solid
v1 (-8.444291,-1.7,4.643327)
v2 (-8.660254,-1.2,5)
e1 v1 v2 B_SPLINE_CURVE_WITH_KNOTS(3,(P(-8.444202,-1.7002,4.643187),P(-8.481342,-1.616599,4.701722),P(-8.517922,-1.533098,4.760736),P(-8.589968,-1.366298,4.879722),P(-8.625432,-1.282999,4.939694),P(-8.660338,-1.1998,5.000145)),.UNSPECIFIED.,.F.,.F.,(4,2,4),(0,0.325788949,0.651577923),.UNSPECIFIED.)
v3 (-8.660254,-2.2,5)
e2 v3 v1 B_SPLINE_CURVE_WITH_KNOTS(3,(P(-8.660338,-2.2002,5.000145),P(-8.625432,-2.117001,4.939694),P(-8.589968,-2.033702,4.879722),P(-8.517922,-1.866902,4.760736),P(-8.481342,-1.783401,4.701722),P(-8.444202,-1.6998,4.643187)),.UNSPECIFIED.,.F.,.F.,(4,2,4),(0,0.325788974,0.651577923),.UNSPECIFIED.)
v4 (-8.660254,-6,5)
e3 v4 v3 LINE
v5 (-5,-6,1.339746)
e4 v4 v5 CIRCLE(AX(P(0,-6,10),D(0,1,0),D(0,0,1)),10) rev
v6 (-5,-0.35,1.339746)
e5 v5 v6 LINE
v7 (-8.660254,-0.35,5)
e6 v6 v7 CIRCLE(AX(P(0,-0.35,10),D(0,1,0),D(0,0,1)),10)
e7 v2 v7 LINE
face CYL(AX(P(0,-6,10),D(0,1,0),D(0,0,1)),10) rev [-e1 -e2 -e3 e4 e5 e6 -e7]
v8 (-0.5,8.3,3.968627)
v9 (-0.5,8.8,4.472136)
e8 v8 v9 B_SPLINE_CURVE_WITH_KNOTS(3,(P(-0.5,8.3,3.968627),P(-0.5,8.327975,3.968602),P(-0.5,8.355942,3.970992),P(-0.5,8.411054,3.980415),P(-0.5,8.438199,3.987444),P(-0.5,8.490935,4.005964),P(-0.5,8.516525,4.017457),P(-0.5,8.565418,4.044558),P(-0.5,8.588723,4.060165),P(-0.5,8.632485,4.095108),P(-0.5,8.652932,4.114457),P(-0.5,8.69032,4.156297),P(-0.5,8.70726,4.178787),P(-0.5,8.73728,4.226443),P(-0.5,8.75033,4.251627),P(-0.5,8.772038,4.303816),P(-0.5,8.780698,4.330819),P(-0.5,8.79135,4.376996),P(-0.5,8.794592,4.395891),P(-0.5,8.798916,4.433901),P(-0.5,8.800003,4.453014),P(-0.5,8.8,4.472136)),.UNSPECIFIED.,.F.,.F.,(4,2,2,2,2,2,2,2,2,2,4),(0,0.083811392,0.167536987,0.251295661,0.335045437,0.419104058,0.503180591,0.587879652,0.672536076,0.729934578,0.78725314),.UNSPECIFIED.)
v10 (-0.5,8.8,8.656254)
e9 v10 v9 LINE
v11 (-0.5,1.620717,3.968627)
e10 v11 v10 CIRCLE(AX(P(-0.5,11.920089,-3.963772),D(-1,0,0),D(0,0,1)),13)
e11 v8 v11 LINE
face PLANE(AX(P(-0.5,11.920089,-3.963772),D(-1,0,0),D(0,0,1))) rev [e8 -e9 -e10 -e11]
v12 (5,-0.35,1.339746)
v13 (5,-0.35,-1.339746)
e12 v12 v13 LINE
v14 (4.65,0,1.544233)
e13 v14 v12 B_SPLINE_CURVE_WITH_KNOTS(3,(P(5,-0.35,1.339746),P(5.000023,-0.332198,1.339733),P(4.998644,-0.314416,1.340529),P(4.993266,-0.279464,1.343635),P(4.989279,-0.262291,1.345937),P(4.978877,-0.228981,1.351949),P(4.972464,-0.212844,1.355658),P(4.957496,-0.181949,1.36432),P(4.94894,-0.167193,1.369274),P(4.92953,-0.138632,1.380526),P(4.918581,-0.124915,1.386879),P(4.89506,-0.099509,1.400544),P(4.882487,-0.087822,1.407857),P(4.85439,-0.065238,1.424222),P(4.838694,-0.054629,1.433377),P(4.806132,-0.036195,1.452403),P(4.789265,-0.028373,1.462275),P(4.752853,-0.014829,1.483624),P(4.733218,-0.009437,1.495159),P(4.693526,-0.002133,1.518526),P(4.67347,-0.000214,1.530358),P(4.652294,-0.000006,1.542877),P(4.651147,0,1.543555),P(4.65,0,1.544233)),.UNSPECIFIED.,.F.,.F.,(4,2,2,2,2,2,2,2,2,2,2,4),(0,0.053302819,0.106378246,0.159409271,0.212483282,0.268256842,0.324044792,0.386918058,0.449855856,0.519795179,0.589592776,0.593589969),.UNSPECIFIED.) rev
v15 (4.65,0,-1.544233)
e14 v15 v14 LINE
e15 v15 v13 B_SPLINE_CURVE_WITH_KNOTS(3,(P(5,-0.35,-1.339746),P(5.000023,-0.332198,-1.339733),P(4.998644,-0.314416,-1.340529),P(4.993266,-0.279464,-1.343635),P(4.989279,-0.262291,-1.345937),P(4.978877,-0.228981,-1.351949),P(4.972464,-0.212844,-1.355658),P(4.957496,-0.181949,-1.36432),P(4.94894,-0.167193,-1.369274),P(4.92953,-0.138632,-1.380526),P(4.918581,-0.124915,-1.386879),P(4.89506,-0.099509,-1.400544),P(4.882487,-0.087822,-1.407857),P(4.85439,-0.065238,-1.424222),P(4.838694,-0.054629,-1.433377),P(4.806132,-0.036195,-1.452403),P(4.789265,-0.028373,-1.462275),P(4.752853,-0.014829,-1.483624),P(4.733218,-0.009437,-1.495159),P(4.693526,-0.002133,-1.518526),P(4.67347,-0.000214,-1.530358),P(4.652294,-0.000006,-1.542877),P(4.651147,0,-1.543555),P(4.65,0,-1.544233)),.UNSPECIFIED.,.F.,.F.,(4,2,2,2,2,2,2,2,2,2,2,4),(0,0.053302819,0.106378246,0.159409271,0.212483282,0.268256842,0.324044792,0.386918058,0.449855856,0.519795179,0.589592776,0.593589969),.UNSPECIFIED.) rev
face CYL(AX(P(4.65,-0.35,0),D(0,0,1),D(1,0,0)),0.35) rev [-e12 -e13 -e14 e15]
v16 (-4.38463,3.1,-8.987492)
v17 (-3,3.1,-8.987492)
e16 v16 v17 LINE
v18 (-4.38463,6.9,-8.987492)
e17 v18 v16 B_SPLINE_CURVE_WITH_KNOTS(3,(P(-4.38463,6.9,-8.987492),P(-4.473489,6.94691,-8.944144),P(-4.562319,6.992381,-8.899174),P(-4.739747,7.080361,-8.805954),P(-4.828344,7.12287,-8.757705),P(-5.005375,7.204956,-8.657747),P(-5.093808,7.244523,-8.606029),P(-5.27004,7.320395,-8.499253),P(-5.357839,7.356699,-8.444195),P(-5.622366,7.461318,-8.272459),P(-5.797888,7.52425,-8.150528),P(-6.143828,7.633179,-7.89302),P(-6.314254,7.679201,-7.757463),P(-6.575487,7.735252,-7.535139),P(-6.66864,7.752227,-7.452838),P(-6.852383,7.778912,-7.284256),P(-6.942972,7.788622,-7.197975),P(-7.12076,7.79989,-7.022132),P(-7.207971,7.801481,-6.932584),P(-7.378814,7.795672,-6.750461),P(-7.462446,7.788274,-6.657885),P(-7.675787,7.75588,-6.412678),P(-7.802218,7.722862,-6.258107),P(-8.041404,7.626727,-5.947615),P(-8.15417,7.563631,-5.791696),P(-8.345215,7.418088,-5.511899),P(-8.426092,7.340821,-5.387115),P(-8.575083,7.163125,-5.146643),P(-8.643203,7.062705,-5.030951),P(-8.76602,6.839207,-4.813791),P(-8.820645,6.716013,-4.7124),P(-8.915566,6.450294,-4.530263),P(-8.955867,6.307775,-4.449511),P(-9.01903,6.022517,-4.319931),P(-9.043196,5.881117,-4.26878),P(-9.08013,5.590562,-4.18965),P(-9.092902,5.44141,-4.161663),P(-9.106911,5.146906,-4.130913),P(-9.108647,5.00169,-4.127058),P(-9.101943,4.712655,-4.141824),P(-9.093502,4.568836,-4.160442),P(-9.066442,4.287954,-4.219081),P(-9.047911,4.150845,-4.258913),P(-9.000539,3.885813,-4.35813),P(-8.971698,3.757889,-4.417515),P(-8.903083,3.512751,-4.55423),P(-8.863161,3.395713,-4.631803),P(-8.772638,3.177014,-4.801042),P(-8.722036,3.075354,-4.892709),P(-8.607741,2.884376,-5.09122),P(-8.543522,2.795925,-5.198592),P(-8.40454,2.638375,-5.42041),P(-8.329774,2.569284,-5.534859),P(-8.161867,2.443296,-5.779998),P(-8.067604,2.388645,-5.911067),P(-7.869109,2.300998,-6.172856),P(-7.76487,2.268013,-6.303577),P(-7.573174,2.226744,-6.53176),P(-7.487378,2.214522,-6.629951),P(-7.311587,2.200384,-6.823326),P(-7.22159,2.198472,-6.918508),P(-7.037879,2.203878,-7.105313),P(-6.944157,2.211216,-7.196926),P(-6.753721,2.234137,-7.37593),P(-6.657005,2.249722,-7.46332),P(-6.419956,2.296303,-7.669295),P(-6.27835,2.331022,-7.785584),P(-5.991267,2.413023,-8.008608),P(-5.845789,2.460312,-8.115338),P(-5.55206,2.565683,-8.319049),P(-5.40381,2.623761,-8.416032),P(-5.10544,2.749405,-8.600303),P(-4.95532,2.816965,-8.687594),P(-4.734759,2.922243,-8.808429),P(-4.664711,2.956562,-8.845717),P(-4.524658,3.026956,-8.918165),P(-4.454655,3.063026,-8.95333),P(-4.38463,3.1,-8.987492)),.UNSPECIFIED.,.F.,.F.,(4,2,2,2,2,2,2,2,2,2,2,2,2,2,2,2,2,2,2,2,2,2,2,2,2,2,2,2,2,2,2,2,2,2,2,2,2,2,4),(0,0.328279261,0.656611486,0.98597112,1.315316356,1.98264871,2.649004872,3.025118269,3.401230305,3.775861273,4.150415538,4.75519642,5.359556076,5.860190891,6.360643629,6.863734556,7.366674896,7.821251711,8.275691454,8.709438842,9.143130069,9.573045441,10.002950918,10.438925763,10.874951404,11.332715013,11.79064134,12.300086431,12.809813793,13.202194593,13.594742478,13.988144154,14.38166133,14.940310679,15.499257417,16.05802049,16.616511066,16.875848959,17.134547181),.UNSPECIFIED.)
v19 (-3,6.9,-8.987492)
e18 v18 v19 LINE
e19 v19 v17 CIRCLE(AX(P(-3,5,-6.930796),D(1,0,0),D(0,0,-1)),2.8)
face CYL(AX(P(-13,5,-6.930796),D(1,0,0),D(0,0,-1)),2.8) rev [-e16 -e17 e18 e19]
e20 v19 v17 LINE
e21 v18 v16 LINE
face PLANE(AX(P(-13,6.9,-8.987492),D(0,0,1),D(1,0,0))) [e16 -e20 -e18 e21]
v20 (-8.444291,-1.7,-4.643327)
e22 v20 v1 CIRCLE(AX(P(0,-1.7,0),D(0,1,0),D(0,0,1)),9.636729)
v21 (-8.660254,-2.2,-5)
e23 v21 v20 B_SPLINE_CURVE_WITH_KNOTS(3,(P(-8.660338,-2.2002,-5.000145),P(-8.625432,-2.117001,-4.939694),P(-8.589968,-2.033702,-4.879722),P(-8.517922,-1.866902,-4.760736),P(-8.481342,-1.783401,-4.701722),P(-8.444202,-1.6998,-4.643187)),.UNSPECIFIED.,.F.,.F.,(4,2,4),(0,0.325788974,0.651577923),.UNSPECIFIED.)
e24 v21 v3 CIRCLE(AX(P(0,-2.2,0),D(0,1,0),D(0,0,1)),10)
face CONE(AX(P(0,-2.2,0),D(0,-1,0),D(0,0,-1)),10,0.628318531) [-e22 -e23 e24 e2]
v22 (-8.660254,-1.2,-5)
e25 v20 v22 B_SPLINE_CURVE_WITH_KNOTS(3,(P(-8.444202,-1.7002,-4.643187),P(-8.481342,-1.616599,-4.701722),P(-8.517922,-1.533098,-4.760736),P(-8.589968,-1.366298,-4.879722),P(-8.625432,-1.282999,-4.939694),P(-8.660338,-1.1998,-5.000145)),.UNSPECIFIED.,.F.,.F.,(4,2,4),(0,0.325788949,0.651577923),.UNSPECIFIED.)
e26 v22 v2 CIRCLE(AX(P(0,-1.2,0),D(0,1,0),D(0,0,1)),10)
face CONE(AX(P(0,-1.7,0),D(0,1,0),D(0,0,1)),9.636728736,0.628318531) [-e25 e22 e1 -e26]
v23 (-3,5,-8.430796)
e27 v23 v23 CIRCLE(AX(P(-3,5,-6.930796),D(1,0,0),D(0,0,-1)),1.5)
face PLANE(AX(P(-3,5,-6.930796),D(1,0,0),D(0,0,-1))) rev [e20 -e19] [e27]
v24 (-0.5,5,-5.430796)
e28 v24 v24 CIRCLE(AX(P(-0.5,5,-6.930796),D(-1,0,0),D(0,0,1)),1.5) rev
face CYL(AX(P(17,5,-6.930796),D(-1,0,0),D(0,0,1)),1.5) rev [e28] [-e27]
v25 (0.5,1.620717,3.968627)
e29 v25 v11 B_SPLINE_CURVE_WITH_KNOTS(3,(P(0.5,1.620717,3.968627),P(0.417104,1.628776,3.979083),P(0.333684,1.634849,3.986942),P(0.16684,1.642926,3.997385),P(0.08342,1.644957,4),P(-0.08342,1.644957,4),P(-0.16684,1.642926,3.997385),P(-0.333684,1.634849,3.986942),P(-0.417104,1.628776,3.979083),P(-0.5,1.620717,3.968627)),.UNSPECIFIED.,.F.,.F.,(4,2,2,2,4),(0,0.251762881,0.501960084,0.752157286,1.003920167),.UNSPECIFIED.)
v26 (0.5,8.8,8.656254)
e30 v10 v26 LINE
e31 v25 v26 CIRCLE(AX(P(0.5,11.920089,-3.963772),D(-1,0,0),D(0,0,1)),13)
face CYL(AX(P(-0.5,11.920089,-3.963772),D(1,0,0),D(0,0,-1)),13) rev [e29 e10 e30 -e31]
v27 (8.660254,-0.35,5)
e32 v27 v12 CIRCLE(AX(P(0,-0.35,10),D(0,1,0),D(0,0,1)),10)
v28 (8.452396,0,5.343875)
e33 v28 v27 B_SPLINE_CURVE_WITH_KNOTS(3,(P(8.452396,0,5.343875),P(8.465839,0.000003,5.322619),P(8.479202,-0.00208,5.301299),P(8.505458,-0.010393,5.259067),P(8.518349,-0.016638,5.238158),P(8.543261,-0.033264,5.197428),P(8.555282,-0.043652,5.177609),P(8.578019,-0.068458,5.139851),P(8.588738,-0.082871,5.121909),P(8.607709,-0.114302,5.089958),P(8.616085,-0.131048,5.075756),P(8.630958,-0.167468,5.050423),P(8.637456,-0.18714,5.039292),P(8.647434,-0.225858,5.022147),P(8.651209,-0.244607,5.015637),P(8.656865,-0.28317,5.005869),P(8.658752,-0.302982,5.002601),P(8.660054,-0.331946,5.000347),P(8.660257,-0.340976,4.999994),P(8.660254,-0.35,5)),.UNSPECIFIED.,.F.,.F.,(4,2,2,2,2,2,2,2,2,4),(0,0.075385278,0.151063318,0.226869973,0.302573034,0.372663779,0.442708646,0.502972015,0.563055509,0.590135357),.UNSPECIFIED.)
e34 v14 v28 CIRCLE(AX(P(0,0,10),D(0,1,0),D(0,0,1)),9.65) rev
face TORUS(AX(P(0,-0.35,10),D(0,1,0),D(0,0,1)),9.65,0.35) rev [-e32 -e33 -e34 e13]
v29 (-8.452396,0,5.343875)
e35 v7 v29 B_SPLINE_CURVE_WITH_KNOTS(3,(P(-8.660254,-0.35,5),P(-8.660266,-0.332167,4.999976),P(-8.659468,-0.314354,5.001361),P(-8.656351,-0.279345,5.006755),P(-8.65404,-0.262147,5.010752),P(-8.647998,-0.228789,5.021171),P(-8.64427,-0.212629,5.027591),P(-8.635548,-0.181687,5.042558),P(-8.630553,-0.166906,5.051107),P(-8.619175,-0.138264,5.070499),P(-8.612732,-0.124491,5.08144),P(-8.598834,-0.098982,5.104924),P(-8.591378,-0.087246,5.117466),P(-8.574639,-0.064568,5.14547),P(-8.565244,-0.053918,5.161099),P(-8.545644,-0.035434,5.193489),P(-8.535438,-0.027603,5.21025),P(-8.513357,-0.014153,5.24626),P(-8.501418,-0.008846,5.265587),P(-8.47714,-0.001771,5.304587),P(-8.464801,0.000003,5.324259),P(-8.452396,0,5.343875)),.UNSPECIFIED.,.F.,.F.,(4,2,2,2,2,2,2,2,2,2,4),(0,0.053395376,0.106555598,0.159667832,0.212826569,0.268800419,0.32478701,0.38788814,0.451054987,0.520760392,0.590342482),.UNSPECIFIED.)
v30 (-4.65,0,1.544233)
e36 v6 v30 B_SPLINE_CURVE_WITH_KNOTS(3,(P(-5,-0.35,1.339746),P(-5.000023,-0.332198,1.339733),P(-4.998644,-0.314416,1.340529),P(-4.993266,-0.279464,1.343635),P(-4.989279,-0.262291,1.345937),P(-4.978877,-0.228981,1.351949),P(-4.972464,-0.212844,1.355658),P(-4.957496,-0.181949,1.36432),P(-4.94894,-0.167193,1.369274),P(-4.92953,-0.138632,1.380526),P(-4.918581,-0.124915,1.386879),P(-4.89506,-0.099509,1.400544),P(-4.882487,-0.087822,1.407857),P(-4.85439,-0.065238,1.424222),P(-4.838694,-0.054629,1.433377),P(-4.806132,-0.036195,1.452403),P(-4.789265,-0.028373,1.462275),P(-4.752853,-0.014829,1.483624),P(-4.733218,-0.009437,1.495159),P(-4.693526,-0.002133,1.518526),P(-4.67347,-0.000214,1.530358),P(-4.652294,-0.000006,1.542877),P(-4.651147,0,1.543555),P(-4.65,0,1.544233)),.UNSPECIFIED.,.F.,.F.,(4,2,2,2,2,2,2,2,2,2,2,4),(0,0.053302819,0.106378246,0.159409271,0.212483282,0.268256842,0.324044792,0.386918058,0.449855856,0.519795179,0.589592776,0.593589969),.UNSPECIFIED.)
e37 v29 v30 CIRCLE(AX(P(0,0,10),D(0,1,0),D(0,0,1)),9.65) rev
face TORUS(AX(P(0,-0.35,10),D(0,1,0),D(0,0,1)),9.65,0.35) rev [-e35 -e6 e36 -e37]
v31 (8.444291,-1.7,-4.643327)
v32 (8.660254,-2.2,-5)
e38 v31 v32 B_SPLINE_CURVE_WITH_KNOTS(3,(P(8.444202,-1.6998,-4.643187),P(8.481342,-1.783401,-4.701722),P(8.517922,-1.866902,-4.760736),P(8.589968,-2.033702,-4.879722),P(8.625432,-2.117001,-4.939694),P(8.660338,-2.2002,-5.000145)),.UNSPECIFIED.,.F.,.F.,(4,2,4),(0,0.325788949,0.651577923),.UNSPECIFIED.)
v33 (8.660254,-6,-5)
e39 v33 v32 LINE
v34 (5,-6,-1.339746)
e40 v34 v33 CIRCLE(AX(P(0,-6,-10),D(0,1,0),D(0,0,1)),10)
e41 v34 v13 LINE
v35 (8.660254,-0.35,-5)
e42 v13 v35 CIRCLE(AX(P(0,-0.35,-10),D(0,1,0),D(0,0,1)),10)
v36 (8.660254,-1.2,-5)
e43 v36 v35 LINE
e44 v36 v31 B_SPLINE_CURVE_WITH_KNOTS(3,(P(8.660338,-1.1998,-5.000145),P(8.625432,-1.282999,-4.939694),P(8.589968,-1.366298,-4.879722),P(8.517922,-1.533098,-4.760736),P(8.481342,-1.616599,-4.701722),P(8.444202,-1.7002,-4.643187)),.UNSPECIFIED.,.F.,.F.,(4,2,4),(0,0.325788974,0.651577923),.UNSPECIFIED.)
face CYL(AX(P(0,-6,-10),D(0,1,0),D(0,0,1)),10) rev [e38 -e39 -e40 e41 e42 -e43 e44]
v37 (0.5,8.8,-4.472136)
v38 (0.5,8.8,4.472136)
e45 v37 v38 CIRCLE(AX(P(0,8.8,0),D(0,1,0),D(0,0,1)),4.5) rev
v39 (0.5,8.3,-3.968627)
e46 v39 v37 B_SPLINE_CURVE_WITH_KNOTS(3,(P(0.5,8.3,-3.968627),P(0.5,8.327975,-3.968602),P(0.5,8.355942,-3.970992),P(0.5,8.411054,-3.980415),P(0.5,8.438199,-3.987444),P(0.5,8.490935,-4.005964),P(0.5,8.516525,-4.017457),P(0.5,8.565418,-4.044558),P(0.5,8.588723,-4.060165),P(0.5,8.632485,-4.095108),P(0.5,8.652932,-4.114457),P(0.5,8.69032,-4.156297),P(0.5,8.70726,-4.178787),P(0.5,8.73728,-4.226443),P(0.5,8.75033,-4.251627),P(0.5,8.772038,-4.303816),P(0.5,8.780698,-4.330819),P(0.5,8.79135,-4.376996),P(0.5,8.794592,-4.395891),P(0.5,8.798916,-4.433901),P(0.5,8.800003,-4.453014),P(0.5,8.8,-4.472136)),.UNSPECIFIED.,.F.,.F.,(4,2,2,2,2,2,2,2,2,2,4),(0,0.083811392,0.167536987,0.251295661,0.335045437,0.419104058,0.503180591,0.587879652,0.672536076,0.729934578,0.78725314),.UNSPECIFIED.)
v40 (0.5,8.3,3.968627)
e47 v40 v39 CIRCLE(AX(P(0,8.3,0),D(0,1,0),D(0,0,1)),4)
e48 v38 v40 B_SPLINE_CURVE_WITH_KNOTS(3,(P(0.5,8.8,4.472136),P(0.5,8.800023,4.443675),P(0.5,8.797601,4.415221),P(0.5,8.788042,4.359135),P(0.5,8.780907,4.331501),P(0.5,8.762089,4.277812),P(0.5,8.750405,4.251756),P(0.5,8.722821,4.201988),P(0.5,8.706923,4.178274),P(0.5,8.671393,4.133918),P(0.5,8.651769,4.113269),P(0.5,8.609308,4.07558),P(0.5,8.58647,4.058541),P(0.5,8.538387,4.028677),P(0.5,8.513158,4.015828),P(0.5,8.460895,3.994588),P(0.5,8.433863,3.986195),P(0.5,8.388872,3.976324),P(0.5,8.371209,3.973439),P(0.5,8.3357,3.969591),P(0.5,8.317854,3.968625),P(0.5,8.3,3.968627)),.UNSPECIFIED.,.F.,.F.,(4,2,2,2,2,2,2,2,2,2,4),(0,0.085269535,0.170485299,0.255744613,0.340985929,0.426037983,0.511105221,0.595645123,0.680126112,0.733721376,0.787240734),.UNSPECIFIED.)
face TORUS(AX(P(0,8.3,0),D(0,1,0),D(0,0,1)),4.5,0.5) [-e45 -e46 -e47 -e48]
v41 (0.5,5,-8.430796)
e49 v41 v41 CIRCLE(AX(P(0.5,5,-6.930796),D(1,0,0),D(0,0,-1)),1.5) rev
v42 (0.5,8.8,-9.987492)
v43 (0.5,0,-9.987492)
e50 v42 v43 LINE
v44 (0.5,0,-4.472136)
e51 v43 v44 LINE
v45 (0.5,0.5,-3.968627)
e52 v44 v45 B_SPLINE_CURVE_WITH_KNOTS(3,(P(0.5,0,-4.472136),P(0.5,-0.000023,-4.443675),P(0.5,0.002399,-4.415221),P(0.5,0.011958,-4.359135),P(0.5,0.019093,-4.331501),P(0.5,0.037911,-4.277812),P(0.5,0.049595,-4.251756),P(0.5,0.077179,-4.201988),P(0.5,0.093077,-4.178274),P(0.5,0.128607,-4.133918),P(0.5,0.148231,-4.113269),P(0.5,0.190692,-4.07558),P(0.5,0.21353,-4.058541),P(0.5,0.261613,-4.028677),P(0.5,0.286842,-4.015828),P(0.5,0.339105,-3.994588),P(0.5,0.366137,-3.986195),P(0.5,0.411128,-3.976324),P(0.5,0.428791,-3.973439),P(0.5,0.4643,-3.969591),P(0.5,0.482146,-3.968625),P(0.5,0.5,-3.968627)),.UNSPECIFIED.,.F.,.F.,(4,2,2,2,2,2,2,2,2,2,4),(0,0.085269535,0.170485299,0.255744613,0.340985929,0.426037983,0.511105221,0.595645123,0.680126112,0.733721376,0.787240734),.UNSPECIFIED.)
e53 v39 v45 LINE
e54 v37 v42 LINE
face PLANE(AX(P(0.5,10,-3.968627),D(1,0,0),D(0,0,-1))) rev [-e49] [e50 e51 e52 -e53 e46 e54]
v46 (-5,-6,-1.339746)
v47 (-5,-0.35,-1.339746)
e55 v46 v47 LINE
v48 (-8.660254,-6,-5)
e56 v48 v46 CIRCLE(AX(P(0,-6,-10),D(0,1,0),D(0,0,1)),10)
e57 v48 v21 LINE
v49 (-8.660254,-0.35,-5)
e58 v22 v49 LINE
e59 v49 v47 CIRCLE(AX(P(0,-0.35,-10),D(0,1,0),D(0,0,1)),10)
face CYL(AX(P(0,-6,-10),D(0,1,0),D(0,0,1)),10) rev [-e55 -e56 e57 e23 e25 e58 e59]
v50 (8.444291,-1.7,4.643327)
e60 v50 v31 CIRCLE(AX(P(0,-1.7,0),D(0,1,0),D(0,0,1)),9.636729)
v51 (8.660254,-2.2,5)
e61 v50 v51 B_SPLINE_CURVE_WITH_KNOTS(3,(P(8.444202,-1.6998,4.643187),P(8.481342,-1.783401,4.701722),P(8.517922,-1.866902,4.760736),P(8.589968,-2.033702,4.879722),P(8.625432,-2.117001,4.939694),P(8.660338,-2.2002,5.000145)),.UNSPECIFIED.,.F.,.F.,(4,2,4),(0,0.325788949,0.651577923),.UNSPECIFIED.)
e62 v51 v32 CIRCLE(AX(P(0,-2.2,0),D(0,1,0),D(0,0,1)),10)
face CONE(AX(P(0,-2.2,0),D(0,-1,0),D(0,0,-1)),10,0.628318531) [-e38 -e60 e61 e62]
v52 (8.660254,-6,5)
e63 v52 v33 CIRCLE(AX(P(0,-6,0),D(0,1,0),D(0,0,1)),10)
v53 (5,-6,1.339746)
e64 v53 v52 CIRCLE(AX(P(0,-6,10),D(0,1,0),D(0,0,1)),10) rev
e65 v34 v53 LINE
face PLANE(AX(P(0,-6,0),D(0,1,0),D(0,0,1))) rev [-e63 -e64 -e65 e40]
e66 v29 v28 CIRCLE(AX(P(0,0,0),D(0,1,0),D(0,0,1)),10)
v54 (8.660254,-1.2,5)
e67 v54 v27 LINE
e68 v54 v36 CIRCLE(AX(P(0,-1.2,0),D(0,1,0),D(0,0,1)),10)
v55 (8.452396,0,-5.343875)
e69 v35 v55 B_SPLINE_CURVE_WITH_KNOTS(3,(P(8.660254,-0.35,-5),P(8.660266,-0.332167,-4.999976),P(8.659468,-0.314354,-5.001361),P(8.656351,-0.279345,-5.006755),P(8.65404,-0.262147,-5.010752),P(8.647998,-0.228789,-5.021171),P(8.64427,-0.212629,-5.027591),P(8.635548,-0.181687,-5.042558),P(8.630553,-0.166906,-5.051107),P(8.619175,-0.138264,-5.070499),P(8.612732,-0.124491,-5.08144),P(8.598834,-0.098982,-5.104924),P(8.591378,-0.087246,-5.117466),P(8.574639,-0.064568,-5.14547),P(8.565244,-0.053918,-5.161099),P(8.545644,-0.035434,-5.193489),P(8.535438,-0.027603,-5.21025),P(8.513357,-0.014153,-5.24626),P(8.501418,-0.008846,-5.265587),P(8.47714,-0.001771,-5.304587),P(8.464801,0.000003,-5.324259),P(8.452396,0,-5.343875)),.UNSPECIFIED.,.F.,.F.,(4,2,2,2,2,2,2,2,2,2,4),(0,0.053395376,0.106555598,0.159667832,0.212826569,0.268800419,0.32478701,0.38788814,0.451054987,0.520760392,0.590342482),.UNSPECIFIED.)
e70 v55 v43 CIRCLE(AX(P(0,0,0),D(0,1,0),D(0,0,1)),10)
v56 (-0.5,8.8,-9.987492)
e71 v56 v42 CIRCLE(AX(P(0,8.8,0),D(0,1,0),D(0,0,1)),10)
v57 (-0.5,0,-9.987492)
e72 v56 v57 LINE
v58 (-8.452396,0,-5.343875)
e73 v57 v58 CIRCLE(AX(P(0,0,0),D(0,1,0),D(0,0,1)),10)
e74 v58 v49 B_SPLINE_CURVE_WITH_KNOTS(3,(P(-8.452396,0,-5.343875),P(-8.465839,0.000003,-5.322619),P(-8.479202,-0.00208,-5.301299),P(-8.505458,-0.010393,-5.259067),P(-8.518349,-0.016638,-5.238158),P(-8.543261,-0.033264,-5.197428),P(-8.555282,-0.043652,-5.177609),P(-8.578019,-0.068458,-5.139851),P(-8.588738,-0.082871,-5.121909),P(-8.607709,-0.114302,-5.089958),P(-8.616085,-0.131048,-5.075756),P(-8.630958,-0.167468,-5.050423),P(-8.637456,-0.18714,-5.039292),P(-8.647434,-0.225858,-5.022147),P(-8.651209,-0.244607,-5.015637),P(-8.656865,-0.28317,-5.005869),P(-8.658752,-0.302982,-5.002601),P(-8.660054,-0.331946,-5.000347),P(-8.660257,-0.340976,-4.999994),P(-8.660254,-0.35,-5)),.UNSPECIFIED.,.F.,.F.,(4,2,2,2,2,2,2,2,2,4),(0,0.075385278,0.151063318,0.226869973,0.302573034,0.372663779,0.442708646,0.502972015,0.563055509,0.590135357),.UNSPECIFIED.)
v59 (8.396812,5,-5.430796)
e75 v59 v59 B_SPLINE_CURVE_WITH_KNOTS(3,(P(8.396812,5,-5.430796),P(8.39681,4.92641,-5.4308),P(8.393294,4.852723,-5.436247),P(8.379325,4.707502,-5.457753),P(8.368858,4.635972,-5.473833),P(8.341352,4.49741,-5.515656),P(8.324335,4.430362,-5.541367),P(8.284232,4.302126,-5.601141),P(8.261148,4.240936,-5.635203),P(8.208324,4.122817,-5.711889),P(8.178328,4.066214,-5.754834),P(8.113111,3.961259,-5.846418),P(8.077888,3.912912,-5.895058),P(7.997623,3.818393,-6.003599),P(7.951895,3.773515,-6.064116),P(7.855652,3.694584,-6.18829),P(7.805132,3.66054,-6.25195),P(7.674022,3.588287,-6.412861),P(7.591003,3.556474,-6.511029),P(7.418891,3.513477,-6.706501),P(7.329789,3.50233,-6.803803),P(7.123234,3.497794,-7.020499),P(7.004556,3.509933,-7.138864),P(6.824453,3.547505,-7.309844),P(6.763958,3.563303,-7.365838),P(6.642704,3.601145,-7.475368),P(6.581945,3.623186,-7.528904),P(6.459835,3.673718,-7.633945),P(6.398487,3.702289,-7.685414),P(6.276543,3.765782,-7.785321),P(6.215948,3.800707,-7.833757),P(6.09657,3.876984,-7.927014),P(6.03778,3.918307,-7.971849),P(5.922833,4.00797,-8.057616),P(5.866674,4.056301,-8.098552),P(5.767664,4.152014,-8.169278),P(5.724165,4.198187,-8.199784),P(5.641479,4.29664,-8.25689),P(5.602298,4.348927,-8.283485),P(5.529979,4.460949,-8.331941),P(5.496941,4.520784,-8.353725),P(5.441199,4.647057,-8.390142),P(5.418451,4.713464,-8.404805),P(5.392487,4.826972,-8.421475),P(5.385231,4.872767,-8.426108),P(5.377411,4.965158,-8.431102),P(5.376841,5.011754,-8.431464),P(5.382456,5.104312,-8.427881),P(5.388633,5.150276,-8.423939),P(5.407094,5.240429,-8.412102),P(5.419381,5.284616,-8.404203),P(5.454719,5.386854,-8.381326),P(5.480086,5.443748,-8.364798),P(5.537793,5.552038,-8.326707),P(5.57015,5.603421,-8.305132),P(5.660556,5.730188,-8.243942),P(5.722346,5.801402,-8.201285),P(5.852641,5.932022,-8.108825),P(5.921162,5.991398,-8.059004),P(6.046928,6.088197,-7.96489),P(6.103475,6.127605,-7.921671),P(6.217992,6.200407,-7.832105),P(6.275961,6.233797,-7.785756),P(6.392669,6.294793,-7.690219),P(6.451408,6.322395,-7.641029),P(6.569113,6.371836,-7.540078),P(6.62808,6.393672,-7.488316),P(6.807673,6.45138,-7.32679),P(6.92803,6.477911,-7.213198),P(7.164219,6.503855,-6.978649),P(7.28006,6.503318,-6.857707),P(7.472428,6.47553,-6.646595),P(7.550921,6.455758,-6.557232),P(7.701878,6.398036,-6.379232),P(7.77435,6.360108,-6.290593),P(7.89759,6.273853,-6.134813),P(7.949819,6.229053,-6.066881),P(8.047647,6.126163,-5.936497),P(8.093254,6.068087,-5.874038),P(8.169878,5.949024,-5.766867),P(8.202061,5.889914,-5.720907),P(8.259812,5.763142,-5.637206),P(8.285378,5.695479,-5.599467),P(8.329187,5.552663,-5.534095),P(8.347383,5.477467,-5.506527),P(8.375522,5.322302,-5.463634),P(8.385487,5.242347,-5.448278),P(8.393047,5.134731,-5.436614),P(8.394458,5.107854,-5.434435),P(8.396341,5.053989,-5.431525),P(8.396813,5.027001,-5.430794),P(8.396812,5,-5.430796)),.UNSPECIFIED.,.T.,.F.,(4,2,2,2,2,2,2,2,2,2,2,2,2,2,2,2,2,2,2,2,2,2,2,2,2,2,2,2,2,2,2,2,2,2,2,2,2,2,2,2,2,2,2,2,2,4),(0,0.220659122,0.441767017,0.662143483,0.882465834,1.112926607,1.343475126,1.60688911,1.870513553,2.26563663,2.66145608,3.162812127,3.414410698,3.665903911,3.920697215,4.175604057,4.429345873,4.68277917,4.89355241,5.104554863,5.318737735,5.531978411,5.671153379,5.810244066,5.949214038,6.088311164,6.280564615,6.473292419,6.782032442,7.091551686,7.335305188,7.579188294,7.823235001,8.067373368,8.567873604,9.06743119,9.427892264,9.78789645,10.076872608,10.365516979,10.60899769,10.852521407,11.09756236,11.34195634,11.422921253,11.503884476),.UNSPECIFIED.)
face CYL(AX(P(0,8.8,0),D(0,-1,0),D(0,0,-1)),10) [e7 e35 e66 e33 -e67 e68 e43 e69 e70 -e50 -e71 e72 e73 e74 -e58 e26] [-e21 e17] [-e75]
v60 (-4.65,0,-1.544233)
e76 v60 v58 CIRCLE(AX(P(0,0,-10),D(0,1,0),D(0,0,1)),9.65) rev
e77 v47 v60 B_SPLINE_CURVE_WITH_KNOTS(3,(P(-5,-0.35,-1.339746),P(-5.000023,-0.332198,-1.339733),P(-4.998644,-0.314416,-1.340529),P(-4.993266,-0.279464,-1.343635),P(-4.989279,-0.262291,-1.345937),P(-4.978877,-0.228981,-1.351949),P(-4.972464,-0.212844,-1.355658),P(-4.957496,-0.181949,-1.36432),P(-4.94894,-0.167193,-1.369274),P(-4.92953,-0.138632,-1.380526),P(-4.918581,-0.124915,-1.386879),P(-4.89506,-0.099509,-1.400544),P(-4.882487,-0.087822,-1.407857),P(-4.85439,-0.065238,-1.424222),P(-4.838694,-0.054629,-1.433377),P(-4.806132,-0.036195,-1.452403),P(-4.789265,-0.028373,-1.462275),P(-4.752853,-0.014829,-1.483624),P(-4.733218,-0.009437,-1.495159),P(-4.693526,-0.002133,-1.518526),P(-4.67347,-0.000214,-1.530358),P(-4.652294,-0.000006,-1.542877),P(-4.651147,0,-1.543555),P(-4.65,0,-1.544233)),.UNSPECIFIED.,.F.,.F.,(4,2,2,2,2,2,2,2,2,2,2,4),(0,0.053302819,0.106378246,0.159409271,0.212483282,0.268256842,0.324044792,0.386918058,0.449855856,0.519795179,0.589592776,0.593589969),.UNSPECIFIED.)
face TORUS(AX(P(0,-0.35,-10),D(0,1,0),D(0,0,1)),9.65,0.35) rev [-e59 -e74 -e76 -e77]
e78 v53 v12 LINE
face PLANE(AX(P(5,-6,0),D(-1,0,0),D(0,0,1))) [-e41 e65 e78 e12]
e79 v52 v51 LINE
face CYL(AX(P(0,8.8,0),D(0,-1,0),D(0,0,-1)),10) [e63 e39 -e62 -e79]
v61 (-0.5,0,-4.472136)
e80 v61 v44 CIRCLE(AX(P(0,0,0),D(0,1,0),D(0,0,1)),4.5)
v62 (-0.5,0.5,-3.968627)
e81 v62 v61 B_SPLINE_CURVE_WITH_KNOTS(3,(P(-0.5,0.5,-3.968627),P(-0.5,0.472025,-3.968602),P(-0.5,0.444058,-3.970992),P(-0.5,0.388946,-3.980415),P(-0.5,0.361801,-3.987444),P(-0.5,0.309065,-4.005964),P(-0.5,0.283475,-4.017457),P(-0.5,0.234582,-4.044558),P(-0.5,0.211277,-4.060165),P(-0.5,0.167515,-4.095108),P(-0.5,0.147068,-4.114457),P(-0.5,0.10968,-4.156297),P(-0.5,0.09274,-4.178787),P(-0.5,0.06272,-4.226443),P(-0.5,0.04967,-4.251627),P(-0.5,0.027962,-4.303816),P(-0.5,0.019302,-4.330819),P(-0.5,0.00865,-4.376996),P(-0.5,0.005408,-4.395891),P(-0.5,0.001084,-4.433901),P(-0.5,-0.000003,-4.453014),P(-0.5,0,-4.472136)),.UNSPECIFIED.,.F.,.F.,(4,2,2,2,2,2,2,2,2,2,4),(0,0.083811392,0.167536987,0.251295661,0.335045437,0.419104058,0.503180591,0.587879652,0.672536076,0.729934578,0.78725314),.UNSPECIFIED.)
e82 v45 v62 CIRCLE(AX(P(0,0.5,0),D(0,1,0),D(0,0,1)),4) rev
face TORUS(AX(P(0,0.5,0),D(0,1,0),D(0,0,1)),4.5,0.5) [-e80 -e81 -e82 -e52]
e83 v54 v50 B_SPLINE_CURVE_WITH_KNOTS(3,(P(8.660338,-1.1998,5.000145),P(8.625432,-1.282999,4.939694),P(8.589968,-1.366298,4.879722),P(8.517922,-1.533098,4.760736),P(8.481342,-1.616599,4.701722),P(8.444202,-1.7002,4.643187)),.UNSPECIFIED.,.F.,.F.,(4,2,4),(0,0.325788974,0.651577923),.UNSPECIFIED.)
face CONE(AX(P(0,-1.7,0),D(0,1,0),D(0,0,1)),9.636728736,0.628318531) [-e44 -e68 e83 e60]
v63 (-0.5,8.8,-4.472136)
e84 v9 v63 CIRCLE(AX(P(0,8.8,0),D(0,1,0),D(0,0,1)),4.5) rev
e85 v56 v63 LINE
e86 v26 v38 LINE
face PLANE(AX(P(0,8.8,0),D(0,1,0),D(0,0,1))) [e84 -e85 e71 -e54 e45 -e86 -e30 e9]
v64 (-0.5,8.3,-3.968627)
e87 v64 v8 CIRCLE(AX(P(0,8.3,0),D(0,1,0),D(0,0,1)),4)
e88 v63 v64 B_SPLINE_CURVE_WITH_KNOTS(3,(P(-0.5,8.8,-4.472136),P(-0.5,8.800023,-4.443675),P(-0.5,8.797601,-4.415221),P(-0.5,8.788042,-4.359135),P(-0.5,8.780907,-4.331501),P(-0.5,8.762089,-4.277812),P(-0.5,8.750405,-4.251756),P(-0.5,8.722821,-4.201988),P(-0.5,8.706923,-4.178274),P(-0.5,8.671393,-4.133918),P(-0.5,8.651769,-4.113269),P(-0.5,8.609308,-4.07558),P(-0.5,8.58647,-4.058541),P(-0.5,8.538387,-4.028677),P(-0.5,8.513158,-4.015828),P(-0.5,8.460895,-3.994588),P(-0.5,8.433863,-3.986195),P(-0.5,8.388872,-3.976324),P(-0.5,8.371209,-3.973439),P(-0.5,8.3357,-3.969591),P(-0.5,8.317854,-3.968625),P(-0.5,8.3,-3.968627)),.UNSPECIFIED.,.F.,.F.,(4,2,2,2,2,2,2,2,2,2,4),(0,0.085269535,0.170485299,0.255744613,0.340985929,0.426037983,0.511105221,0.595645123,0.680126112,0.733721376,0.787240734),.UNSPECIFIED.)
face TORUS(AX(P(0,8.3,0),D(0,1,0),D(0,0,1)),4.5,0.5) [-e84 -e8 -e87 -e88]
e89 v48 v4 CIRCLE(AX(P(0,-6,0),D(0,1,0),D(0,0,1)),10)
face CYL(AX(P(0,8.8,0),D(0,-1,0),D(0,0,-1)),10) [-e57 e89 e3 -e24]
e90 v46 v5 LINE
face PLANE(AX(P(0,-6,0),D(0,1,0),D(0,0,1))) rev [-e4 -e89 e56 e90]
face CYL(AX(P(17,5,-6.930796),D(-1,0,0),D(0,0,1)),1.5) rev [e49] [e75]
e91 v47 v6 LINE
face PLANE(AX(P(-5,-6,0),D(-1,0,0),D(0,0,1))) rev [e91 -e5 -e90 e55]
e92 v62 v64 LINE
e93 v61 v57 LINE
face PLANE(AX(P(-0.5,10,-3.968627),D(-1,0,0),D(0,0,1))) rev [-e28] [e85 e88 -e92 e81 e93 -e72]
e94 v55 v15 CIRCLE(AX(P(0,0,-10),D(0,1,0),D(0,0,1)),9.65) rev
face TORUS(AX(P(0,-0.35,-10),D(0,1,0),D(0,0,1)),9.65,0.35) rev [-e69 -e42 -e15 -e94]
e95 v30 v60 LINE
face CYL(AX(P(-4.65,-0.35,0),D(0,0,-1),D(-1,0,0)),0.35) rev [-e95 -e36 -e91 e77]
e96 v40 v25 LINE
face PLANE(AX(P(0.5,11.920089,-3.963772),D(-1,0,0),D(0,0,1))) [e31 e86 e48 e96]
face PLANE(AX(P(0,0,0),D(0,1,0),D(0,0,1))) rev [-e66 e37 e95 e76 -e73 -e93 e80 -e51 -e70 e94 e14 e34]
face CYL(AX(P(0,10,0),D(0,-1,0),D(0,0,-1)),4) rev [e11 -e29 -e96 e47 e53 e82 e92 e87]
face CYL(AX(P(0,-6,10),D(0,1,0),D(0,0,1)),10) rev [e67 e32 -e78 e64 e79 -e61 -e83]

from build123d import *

# Parameters (mm, degrees)
SKETCH_1_R          = 10
EXTRUDE_1_DEPTH     = 8.8
EXTRUDE_START       = -6
EXTRUDE_2_DEPTH     = 6
SKETCH_2_R          = 4
CUT_EXTRUDE_1_DEPTH = 10
CUT_EXTRUDE_2_DEPTH = 10
CUT_EXTRUDE_3_DEPTH = 10
SKETCH_4_3_R        = 1.5
CUT_EXTRUDE_4_DEPTH = 20
CUT_EXTRUDE_5_DEPTH = 0.5
FILLET_1_R          = 0.35
FILLET_2_R          = 0.5
FILLET_3_R          = 0.5


with BuildPart() as part:
    # 草图1 → 凸台-拉伸1 (new body)
    with BuildSketch(Plane(origin=(0, 0, 0), x_dir=(1, 0, 0), z_dir=(0, 1, 0))):
        Circle(SKETCH_1_R)
    extrude(amount=EXTRUDE_1_DEPTH)

    # 草图1<3> → 凸台-拉伸2 (add)
    with BuildSketch(Plane(origin=(0, 0, 0), x_dir=(1, 0, 0), z_dir=(0, 1, 0)).offset(EXTRUDE_START)):
        with BuildLine():
            Line((-5, -1.339745962), (-5, 1.339745962))
            ThreePointArc((-5, 1.339745962), (-7.071067812, 2.928932188), (-8.660254038, 5))
            ThreePointArc((-8.660254038, 5), (-10, 0), (-8.660254038, -5))
            ThreePointArc((-8.660254038, -5), (-7.071067812, -2.928932188), (-5, -1.339745962))
        make_face()
        with BuildLine():
            ThreePointArc((8.660254038, -5), (10, 0), (8.660254038, 5))
            ThreePointArc((8.660254038, 5), (7.071067812, 2.928932188), (5, 1.339745962))
            Line((5, 1.339745962), (5, -1.339745962))
            ThreePointArc((5, -1.339745962), (7.071067812, -2.928932188), (8.660254038, -5))
        make_face()
    extrude(amount=EXTRUDE_2_DEPTH)

    # 草图2 → 切除-拉伸1 (cut)
    with BuildSketch(Plane.XZ):
        Circle(SKETCH_2_R)
    extrude(amount=-CUT_EXTRUDE_1_DEPTH, mode=Mode.SUBTRACT)

    # 草图3 → 切除-拉伸2 (cut)
    with BuildSketch(Plane.XZ):
        with BuildLine():
            Line((-0.5, -3.968626967), (-0.5, -9.987492178))
            ThreePointArc((-0.5, -9.987492178), (0, -10), (0.5, -9.987492178))
            Line((0.5, -9.987492178), (0.5, -3.968626967))
            ThreePointArc((0.5, -3.968626967), (0, -4), (-0.5, -3.968626967))
        make_face()
    extrude(amount=-CUT_EXTRUDE_2_DEPTH, mode=Mode.SUBTRACT)

    # 草图4 → 切除-拉伸3 (cut)
    with BuildSketch(Plane(origin=(-3, 0, 0), x_dir=(0, 0, -1), z_dir=(1, 0, 0))):
        with BuildLine():
            Line((8.987492178, 6.9), (8.987492178, 3.1))
            ThreePointArc((8.987492178, 3.1), (4.130795798, 5), (8.987492178, 6.9))
        make_face()
    extrude(amount=-CUT_EXTRUDE_3_DEPTH, mode=Mode.SUBTRACT)

    # 草图4<3> → 切除-拉伸4 (cut)
    with BuildSketch(Plane(origin=(-3, 0, 0), x_dir=(0, 0, -1), z_dir=(1, 0, 0))):
        with Locations((6.930795798, 5)):
            Circle(SKETCH_4_3_R)
    extrude(amount=CUT_EXTRUDE_4_DEPTH, mode=Mode.SUBTRACT)

    # 草图5 → 切除-拉伸5 (cut, symmetric)
    with BuildSketch(Plane(origin=(0, 0, 0), x_dir=(0, 0, -1), z_dir=(1, 0, 0))):
        with BuildLine():
            Line((-8.656253911, 8.8), (-0.006253911, 8.8))
            Line((-0.006253911, 8.8), (-0.006253911, -0.458881174))
            ThreePointArc((-0.006253911, -0.458881174), (-5.535658287, 3.0453589), (-8.656253911, 8.8))
        make_face()
    extrude(amount=CUT_EXTRUDE_5_DEPTH, both=True, mode=Mode.SUBTRACT)

    # 草图6 → 切除-旋转2 (revolve, cut)
    with BuildSketch(Plane.XY):
        Polygon((-10, -2.2), (-10, -1.2), (-9.636728736, -1.7), align=None)
    revolve(axis=Axis((0, 10, 0), (0, -1, 0)), mode=Mode.SUBTRACT)

    # 圆角1
    fillet_1_edges = [part.edges().sort_by_distance(p)[0] for p in [
        (7.071067812, 0, 2.928932188),
        (5, 0, 0),
        (7.071067812, 0, -2.928932188),
        (-7.071067812, 0, 2.928932188),
        (-5, 0, 0),
        (-7.071067812, 0, -2.928932188),
    ]]
    fillet(fillet_1_edges, radius=FILLET_1_R)

    # 圆角2
    fillet_2_edges = [part.edges().sort_by_distance(p)[0] for p in [
        (4, 8.8, 0),
        (-4, 8.8, 0),
    ]]
    fillet(fillet_2_edges, radius=FILLET_2_R)

    # 圆角3
    fillet_3_edges = [part.edges().sort_by_distance(p)[0] for p in [
        (0, 0, 4),
    ]]
    fillet(fillet_3_edges, radius=FILLET_3_R)


solid = part.part
